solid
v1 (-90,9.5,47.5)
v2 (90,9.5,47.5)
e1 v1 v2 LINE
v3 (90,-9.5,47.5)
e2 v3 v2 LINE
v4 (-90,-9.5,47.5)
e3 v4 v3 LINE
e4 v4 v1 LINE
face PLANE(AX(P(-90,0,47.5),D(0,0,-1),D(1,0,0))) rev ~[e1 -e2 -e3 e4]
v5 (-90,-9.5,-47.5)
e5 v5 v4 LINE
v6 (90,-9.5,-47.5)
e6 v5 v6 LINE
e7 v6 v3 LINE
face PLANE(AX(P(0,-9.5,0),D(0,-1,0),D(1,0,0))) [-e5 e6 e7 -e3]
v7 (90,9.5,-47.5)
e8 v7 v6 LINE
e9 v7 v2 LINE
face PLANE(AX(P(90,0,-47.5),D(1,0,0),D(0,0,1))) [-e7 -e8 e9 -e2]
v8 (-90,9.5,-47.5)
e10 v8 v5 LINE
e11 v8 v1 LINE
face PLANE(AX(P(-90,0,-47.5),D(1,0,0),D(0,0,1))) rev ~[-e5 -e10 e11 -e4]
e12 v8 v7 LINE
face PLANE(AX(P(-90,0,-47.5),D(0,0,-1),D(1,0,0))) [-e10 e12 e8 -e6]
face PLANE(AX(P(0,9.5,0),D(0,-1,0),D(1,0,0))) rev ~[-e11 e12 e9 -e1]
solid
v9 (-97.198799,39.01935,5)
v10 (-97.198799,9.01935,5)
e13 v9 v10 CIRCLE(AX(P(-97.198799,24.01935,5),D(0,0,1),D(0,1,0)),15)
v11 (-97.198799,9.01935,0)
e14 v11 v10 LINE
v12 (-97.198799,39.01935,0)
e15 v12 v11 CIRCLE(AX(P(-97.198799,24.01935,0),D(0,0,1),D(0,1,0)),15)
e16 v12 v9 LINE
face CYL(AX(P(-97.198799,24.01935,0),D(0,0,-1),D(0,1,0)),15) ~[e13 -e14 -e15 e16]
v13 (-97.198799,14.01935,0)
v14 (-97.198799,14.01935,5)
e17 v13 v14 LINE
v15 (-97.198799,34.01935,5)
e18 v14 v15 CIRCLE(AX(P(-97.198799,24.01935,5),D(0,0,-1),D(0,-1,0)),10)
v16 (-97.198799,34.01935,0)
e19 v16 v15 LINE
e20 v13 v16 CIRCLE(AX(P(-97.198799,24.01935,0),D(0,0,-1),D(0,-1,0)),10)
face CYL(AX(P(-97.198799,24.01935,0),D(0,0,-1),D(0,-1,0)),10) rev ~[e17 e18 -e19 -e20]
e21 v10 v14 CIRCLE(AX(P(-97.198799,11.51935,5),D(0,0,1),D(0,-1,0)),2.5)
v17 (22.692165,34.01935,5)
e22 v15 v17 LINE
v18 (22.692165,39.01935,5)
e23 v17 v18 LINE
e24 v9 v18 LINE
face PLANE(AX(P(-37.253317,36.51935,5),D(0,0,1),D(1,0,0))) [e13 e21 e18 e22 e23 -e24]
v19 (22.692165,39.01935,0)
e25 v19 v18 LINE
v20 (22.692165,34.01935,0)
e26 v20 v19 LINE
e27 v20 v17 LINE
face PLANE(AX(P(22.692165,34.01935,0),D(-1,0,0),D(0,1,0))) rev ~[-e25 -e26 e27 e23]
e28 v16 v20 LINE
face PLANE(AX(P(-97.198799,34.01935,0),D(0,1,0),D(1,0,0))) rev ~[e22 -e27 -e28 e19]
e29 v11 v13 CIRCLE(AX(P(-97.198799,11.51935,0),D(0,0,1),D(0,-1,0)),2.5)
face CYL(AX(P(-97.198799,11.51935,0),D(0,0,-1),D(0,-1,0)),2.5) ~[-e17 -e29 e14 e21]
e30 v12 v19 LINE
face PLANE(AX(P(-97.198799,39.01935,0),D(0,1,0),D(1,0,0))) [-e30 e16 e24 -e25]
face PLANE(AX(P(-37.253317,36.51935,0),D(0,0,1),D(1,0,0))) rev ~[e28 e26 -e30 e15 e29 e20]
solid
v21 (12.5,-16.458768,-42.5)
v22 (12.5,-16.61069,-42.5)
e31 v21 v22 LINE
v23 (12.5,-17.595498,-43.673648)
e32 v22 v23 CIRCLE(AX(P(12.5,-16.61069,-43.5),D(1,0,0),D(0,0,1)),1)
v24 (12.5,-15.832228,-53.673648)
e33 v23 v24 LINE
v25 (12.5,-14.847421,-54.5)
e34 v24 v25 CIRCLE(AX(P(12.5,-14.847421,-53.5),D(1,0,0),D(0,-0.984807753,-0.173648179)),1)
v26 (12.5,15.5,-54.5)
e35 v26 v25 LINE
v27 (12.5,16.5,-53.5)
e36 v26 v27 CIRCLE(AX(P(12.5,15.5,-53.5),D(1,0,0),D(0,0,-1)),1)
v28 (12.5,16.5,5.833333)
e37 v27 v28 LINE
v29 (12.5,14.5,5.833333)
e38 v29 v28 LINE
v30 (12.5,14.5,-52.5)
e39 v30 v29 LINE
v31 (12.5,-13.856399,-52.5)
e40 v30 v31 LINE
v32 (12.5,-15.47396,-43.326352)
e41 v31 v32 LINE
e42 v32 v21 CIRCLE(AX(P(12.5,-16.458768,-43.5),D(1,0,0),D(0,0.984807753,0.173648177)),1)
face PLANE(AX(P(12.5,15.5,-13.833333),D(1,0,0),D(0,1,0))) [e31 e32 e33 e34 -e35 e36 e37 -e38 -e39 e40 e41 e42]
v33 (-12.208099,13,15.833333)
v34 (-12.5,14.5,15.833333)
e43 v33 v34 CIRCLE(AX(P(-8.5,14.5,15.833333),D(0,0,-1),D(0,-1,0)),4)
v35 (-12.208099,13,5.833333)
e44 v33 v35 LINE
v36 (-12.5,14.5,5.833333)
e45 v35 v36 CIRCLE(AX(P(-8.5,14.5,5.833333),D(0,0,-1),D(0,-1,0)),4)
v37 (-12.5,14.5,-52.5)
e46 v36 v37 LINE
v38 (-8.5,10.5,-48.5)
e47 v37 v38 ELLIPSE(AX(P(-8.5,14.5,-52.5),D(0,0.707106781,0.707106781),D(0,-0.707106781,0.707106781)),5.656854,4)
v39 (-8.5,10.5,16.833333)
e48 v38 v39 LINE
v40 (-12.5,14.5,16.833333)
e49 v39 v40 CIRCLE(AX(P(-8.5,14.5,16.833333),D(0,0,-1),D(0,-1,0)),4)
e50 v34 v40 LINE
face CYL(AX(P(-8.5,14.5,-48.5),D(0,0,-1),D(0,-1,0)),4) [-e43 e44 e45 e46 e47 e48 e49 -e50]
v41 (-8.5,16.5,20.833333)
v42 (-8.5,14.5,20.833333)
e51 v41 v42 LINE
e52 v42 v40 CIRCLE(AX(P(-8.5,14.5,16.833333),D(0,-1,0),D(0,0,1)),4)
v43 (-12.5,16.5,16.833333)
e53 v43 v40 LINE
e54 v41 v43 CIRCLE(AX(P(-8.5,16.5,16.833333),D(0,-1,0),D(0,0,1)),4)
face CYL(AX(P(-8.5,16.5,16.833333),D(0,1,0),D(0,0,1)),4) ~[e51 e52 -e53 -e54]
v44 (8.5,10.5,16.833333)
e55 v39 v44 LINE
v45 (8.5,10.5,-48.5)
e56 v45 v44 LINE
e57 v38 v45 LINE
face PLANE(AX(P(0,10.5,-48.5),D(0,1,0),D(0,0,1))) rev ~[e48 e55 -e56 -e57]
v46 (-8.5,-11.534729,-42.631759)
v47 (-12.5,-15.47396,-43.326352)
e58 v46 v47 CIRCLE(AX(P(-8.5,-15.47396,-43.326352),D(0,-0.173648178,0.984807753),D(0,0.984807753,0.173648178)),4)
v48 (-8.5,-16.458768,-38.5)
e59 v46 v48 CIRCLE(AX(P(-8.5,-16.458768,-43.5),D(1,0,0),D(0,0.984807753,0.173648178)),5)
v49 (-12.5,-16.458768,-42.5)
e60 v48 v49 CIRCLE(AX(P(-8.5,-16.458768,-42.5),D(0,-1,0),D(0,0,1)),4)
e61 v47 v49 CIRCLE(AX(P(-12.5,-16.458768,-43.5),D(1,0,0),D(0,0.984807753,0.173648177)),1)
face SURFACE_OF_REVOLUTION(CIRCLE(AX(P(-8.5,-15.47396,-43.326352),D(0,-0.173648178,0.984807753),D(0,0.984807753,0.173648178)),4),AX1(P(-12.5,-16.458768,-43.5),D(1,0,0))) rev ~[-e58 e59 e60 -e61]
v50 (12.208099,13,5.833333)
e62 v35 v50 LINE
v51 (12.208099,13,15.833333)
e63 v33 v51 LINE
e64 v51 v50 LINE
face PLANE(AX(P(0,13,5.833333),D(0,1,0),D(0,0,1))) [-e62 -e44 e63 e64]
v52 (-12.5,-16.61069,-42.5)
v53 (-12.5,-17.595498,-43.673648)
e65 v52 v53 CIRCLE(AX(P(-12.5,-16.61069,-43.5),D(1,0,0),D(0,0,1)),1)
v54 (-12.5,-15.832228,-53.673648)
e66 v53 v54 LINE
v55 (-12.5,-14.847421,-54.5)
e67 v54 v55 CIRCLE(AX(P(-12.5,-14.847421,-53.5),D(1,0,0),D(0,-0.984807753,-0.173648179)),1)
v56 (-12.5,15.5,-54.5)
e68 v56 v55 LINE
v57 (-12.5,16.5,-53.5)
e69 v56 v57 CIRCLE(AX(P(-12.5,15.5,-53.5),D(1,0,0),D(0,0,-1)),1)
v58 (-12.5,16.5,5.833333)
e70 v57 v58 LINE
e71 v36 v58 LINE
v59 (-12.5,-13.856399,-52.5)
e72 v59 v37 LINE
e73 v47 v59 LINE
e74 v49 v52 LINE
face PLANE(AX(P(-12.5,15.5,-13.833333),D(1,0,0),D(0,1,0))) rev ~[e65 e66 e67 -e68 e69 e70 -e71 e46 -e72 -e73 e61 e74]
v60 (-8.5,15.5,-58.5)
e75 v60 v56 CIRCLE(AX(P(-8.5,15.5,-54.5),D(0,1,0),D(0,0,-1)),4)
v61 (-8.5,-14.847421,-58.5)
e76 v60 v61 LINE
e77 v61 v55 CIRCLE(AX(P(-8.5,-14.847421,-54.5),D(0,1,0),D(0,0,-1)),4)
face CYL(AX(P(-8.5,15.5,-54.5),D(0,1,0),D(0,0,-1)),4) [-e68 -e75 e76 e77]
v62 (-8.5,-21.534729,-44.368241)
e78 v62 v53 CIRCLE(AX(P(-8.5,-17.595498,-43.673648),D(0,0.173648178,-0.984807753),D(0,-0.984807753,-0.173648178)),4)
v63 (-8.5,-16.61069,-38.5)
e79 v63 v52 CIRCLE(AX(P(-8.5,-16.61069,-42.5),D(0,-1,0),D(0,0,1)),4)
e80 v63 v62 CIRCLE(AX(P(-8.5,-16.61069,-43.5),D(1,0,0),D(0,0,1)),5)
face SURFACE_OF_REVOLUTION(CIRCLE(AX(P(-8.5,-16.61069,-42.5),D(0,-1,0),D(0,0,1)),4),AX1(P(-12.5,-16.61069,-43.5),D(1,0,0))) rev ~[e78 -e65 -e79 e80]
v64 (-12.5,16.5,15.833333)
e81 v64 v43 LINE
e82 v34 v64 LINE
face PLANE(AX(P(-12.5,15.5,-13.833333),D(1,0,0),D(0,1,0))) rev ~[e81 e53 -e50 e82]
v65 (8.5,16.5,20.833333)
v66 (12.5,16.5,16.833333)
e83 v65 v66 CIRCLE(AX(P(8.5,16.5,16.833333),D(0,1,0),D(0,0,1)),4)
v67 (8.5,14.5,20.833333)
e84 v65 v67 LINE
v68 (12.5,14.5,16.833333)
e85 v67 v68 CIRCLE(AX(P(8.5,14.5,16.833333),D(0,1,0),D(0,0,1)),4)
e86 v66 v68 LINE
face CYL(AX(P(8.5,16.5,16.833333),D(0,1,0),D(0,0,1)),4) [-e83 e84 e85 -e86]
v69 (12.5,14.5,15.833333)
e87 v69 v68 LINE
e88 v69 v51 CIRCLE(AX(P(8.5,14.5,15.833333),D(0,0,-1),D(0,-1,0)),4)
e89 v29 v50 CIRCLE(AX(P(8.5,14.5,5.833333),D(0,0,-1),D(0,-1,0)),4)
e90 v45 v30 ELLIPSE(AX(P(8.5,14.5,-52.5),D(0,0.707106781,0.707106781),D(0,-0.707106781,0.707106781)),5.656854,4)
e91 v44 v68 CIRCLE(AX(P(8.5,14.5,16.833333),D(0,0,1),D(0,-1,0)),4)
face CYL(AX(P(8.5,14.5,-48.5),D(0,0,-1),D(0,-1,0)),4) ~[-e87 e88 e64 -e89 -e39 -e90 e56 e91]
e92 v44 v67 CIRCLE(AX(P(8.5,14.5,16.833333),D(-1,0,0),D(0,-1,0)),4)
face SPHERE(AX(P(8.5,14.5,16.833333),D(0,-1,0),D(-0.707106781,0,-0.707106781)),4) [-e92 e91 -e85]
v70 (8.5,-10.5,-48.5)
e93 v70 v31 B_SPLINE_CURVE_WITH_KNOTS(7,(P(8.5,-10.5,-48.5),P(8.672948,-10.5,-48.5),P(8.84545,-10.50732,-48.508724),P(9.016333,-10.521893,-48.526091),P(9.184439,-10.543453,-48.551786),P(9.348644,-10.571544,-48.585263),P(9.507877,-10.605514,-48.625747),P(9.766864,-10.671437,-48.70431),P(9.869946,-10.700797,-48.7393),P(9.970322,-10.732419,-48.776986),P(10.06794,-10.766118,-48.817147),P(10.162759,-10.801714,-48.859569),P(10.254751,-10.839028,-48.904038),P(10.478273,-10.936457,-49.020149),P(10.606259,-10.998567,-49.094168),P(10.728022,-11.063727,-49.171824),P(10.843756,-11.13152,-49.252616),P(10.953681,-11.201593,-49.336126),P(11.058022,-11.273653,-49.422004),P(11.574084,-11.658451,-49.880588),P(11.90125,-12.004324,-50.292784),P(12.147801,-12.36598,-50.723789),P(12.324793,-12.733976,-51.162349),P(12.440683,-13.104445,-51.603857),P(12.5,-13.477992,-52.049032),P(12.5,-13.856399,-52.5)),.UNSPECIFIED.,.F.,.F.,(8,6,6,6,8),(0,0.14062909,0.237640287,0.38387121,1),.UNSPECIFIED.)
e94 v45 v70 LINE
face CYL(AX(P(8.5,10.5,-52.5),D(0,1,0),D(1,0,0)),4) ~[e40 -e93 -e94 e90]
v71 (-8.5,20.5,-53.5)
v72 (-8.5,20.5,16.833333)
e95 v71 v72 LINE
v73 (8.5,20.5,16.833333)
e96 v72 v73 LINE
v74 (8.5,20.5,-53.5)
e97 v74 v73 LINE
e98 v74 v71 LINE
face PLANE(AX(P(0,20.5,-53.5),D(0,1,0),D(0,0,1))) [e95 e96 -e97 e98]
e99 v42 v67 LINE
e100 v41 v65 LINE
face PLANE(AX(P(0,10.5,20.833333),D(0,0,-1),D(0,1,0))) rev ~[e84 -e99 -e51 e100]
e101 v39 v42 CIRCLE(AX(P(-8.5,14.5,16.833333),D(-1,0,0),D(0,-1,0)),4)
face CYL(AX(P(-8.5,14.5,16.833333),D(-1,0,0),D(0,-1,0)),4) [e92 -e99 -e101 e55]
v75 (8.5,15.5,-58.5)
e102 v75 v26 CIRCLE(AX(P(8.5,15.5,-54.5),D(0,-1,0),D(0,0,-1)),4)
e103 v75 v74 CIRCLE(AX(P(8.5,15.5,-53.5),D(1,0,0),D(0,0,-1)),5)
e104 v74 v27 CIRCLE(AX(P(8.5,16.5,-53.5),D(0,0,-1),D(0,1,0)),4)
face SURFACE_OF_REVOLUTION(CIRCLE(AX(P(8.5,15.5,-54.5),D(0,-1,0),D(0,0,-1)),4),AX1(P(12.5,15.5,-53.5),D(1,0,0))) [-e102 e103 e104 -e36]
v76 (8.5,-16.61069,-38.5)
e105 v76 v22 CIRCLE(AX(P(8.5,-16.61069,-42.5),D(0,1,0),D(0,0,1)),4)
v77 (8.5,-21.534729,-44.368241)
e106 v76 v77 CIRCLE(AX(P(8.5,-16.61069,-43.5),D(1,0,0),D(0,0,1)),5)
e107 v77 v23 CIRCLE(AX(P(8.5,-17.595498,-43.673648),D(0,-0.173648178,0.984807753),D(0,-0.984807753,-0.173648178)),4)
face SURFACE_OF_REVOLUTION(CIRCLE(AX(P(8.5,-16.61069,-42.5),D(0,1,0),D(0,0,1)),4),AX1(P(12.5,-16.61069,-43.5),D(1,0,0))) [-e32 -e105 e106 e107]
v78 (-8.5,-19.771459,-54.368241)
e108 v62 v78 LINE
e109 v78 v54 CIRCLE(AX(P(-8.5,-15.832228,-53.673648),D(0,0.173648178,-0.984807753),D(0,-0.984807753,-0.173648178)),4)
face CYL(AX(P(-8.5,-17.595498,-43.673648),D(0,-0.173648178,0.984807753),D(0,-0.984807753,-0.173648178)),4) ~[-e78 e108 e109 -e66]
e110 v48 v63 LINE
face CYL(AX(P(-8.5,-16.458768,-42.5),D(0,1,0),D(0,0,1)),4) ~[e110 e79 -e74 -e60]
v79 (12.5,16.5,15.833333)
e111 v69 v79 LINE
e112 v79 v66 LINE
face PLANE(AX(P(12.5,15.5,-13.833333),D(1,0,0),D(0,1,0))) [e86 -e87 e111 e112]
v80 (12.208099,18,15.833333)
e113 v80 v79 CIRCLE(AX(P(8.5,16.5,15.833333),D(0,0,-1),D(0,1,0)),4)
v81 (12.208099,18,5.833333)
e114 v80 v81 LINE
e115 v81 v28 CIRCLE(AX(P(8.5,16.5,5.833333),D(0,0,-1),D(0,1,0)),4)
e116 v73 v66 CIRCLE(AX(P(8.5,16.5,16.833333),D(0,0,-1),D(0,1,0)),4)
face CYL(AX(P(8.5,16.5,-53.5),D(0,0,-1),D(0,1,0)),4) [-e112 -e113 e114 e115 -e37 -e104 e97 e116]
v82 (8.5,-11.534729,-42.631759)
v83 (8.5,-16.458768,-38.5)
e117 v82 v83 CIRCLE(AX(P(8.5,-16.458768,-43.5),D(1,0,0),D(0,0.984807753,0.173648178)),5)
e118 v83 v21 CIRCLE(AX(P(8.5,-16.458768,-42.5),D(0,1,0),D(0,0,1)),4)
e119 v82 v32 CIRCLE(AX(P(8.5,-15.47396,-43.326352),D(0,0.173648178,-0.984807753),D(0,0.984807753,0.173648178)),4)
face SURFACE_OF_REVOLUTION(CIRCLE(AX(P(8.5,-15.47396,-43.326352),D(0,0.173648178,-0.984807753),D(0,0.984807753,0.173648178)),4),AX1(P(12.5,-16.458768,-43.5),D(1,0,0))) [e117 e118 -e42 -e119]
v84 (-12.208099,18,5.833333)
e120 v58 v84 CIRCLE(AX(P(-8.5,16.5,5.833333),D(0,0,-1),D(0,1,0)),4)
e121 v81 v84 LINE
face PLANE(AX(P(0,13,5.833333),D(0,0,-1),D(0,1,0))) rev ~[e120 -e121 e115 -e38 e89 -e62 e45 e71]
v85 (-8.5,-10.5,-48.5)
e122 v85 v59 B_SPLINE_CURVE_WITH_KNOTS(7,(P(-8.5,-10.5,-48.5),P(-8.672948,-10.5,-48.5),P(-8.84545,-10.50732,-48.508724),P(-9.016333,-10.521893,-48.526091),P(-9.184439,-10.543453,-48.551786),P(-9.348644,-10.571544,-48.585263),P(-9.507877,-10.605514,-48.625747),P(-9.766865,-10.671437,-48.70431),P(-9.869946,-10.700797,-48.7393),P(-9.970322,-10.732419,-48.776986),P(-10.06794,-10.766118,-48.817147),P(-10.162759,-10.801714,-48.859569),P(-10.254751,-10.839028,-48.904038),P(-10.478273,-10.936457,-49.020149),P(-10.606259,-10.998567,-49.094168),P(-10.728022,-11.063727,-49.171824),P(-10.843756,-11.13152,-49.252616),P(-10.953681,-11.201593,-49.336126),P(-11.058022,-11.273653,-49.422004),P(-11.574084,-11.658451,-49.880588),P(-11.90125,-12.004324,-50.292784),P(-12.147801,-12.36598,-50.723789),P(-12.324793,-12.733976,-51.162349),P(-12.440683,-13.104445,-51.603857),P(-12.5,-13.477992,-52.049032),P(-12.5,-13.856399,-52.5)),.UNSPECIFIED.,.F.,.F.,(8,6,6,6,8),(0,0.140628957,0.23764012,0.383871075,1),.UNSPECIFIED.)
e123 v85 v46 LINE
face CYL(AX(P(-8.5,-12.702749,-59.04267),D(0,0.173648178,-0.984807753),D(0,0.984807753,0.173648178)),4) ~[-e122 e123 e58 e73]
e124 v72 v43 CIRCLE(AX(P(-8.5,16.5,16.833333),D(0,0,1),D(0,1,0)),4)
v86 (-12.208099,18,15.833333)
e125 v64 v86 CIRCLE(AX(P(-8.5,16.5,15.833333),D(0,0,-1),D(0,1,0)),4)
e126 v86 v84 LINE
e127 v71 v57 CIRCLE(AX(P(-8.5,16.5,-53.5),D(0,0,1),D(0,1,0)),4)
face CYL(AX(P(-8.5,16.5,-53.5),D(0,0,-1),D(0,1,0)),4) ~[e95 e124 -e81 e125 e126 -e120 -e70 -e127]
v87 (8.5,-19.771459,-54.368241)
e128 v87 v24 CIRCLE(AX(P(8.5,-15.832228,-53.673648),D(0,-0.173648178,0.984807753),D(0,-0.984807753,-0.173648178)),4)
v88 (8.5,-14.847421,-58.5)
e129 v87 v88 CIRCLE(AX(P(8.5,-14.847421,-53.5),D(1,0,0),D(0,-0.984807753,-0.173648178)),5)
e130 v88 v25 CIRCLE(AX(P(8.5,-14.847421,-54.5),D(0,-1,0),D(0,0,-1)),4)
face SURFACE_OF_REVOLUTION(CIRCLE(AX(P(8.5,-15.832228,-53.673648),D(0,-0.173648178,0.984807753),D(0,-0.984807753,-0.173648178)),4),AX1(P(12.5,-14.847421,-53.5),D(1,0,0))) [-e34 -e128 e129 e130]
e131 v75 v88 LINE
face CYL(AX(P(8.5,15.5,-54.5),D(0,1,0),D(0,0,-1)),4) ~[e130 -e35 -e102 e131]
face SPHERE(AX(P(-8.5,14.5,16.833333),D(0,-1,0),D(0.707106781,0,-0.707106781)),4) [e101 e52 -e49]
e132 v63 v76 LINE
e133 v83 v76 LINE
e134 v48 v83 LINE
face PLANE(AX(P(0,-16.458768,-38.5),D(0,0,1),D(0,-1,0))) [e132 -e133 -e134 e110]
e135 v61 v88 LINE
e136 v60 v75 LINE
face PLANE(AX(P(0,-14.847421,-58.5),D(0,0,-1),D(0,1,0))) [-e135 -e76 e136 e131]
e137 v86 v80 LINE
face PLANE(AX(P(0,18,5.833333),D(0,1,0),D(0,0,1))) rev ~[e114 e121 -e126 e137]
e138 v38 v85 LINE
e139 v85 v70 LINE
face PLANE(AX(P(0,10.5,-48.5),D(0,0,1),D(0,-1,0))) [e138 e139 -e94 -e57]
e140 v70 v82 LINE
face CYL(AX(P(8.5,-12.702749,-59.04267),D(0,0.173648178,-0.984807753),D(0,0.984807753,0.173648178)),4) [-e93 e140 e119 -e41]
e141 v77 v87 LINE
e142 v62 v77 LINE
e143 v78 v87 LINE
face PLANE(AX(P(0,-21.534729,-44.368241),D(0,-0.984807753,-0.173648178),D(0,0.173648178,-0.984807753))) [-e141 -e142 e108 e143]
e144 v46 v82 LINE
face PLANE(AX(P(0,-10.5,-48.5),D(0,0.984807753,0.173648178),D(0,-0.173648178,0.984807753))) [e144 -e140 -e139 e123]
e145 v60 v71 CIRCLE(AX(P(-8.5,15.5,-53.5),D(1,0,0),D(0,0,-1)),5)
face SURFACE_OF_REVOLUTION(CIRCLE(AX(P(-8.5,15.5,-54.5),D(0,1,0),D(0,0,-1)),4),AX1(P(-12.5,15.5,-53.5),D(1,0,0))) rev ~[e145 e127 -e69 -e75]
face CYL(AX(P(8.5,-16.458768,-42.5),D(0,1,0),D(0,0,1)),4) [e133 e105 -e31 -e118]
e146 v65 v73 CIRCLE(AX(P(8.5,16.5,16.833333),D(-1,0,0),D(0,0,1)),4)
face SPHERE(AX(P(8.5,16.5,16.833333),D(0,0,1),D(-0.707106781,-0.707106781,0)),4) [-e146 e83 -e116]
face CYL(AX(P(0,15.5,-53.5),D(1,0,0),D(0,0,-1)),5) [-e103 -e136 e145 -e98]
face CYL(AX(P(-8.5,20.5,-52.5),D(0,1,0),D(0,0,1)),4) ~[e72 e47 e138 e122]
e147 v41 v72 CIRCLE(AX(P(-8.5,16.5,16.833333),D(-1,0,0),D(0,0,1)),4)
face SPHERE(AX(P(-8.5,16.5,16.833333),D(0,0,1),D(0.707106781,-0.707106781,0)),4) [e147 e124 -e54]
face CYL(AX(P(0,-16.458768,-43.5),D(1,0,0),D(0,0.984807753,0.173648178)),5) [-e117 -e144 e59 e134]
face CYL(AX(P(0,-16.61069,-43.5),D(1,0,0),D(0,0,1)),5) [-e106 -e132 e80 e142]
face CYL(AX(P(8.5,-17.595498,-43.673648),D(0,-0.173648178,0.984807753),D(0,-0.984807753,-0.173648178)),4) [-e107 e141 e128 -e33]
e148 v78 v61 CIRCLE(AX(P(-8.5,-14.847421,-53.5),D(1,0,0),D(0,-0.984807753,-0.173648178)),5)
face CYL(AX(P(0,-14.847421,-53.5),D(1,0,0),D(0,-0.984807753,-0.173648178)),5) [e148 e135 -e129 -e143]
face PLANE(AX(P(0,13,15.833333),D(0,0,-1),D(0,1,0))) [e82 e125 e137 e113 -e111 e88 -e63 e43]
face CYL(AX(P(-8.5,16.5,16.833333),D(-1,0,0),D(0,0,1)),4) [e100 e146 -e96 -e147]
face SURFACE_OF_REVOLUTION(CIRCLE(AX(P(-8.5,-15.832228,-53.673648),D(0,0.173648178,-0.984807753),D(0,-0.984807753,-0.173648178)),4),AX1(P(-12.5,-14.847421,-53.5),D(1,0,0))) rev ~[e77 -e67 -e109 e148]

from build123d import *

# Parameters (mm, degrees)
F0_W          = 180
F0_H          = 95
F1_DEPTH      = 9.5
F3_W          = 10
F3_H          = 69.3333333333
F3_W_2        = 5
F3_H_2        = 10
F4_DEPTH      = 12.5
F5_T1_DEPTH   = 10.1542661189
F5_T3_DEPTH   = 65.3333333333
F5_T5_DEPTH   = 2
F5_T7_DEPTH   = 17
F5_T9_DEPTH   = 30.3474206258
F5_T11_DEPTH  = 70.3333333333
F5_T13_DEPTH  = 0.1519224699
F5_S17_W      = 4
F5_S17_H      = 4
F5_T18_DEPTH  = 4
F5_S23_W      = 4
F5_S23_H      = 4
F5_T24_DEPTH  = 4
F5_S29_W      = 4
F5_S29_H      = 4
F5_T30_DEPTH  = 4
F5_S35_W      = 4
F5_S35_H      = 4
F5_T36_DEPTH  = 4
F5_T42_DEPTH  = 31
F5_T47_DEPTH  = 31
F5_T50_ANGLE  = 100
F5_T52_ANGLE  = 80
F5_T54_ANGLE  = 90
F5_T56_ANGLE  = 80
F5_T60_DEPTH  = 15.958767963
F5_T63_ANGLE  = 100
F5_T65_ANGLE  = 80
F5_T67_ANGLE  = 90
F5_T69_ANGLE  = 80
F5_T73_DEPTH  = 15.958767963
F5_T79_DEPTH  = 75.3333333333
F5_T83_DEPTH  = 41
F5_T90_DEPTH  = 15.958767963
F5_T94_DEPTH  = 31
F5_T101_DEPTH = 75.3333333333
F5_T105_DEPTH = 41
F5_T112_DEPTH = 15.958767963
F5_T116_DEPTH = 31
F6_W          = 119.8909639199
F6_H          = 5
F7_DEPTH      = 5


# Not quite as in the source:
# - a fillet or chamfer that OpenCascade refuses, or shapes differently, is made with other operations: its cross-section is extruded or revolved along the edge and cut away or added


with BuildPart() as f1:
    # F0 (on Front) → F1 (new body, symmetric)
    with BuildSketch(Plane.XZ):
        Rectangle(F0_W, F0_H)
    extrude(amount=F1_DEPTH, both=True)


with BuildPart() as f4:
    # F3 (on Right) → F4 (new body, symmetric)
    with BuildSketch(Plane.YZ):
        with Locations((15.5, -13.8333333333)):
            Rectangle(F3_W, F3_H)
        with Locations((15.5, 10.8333333333)):
            Rectangle(F3_W_2, F3_H_2, mode=Mode.SUBTRACT)
        with BuildLine():
            Line((20.5, -53.5), (20.5, -48.5))
            Line((20.5, -48.5), (10.5, -48.5))
            Line((10.5, -48.5), (-10.5, -48.5))
            Line((-10.5, -48.5), (-8.7367301929, -58.5))
            Line((-8.7367301929, -58.5), (15.5, -58.5))
            ThreePointArc((15.5, -58.5), (19.0355339059, -57.0355339059), (20.5, -53.5))
        make_face()
        Polygon((-8.7367301929, -58.5), (-10.5, -48.5), (-10.5, -58.5), align=None)
        with BuildLine():
            Line((-10.5, -58.5), (-10.5, -48.5))
            Line((-10.5, -48.5), (-11.5347291979, -42.6317591117))
            ThreePointArc((-11.5347291979, -42.6317591117), (-13.2448299145, -39.6697777844), (-16.458767963, -38.5))
            Line((-16.458767963, -38.5), (-16.6106904328, -38.5))
            ThreePointArc((-16.6106904328, -38.5), (-20.4409126484, -40.2860619516), (-21.5347291979, -44.3682408883))
            Line((-21.5347291979, -44.3682408883), (-19.7714593908, -54.3682408883))
            ThreePointArc((-19.7714593908, -54.3682408883), (-18.0613586742, -57.3302222156), (-14.8474206258, -58.5))
            Line((-14.8474206258, -58.5), (-10.5, -58.5))
        make_face()
    extrude(amount=F4_DEPTH, both=True)

    # F5: fillet of radius 4 on 10 edges, made by hand

    # F5_s2 → F5_t1 (cut)
    with BuildSketch(Plane(origin=(0, 6.9380645139, -39.3477191408), x_dir=(1, 0, 0), z_dir=(0, 0.1736481777, -0.984807753))):
        with BuildLine():
            ThreePointArc((-8.5, 28.9120324497), (-11.3284271247, 27.7404595744), (-12.5, 24.9120324497))
            Line((-12.5, 24.9120324497), (-12.5, 28.9120324497))
            Line((-12.5, 28.9120324497), (-8.5, 28.9120324497))
        make_face()
        with BuildLine():
            ThreePointArc((8.5, 28.9120324497), (11.3284271247, 27.7404595744), (12.5, 24.9120324497))
            Line((12.5, 24.9120324497), (12.5, 28.9120324497))
            Line((12.5, 28.9120324497), (8.5, 28.9120324497))
        make_face()
    extrude(amount=F5_T1_DEPTH, mode=Mode.SUBTRACT)

    # F5_s4 → F5_t3 (cut)
    with BuildSketch(Plane.XY.offset(-48.5)):
        with BuildLine():
            ThreePointArc((8.5, 10.5), (11.3284271247, 11.6715728753), (12.5, 14.5))
            Line((12.5, 14.5), (12.5, 10.5))
            Line((12.5, 10.5), (8.5, 10.5))
        make_face()
        with BuildLine():
            ThreePointArc((-8.5, 10.5), (-11.3284271247, 11.6715728753), (-12.5, 14.5))
            Line((-12.5, 14.5), (-12.5, 10.5))
            Line((-12.5, 10.5), (-8.5, 10.5))
        make_face()
    extrude(amount=F5_T3_DEPTH, mode=Mode.SUBTRACT)

    # F5_s6 → F5_t5 (cut)
    with BuildSketch(Plane.XZ.offset(-16.5)):
        with BuildLine():
            ThreePointArc((-8.5, 20.8333333333), (-11.3284271247, 19.6617604581), (-12.5, 16.8333333333))
            Line((-12.5, 16.8333333333), (-12.5, 20.8333333333))
            Line((-12.5, 20.8333333333), (-8.5, 20.8333333333))
        make_face()
        with BuildLine():
            ThreePointArc((8.5, 20.8333333333), (11.3284271247, 19.6617604581), (12.5, 16.8333333333))
            Line((12.5, 16.8333333333), (12.5, 20.8333333333))
            Line((12.5, 20.8333333333), (8.5, 20.8333333333))
        make_face()
    extrude(amount=F5_T5_DEPTH, mode=Mode.SUBTRACT)

    # F5_s8 → F5_t7 (cut)
    with BuildSketch(Plane.YZ.offset(-8.5)):
        with BuildLine():
            ThreePointArc((10.5, 16.8333333333), (11.6715728753, 19.6617604581), (14.5, 20.8333333333))
            Line((14.5, 20.8333333333), (10.5, 20.8333333333))
            Line((10.5, 20.8333333333), (10.5, 16.8333333333))
        make_face()
        with BuildLine():
            ThreePointArc((16.5, 20.8333333333), (19.3284271247, 19.6617604581), (20.5, 16.8333333333))
            Line((20.5, 16.8333333333), (20.5, 20.8333333333))
            Line((20.5, 20.8333333333), (16.5, 20.8333333333))
        make_face()
    extrude(amount=F5_T7_DEPTH, mode=Mode.SUBTRACT)

    # F5_s10 → F5_t9 (cut)
    with BuildSketch(Plane.XZ.offset(-15.5)):
        with BuildLine():
            ThreePointArc((8.5, -58.5), (11.3284271247, -57.3284271247), (12.5, -54.5))
            Line((12.5, -54.5), (12.5, -58.5))
            Line((12.5, -58.5), (8.5, -58.5))
        make_face()
        with BuildLine():
            ThreePointArc((-8.5, -58.5), (-11.3284271247, -57.3284271247), (-12.5, -54.5))
            Line((-12.5, -54.5), (-12.5, -58.5))
            Line((-12.5, -58.5), (-8.5, -58.5))
        make_face()
    extrude(amount=F5_T9_DEPTH, mode=Mode.SUBTRACT)

    # F5_s12 → F5_t11 (cut)
    with BuildSketch(Plane.XY.offset(-53.5)):
        with BuildLine():
            ThreePointArc((8.5, 20.5), (11.3284271247, 19.3284271247), (12.5, 16.5))
            Line((12.5, 16.5), (12.5, 20.5))
            Line((12.5, 20.5), (8.5, 20.5))
        make_face()
        with BuildLine():
            ThreePointArc((-8.5, 20.5), (-11.3284271247, 19.3284271247), (-12.5, 16.5))
            Line((-12.5, 16.5), (-12.5, 20.5))
            Line((-12.5, 20.5), (-8.5, 20.5))
        make_face()
    extrude(amount=F5_T11_DEPTH, mode=Mode.SUBTRACT)

    # F5_s14 → F5_t13 (cut)
    with BuildSketch(Plane.XZ.offset(16.458767963)):
        with BuildLine():
            ThreePointArc((8.5, -38.5), (11.3284271247, -39.6715728753), (12.5, -42.5))
            Line((12.5, -42.5), (12.5, -38.5))
            Line((12.5, -38.5), (8.5, -38.5))
        make_face()
        with BuildLine():
            ThreePointArc((-8.5, -38.5), (-11.3284271247, -39.6715728753), (-12.5, -42.5))
            Line((-12.5, -42.5), (-12.5, -38.5))
            Line((-12.5, -38.5), (-8.5, -38.5))
        make_face()
    extrude(amount=F5_T13_DEPTH, mode=Mode.SUBTRACT)


with BuildPart() as f5_tool16:
    # F5_s17 → F5_t18 (new body)
    with BuildSketch(Plane.XZ.offset(-14.5)):
        with Locations((10.5, 18.8333333333)):
            Rectangle(F5_S17_W, F5_S17_H)
    extrude(amount=F5_T18_DEPTH)

    # F5_s19 → F5_t20 (revolve, cut)
    with BuildSketch(Plane(origin=(8.5, 14.5, 16.8333333333), x_dir=(-0.7071067812, 0, -0.7071067812), z_dir=(-0.7071067812, 0, 0.7071067812))):
        with BuildLine():
            ThreePointArc((0, -4), (4, 0), (0, 4))
            Line((0, 4), (0, -4))
        make_face()
    revolve(axis=Axis((8.5, 14.5, 16.8333333333), (0, -1, 0)), mode=Mode.SUBTRACT)


with BuildPart() as f4_1:
    add(f4.part)

    # F5_t15: cut F5_tool16
    add(f5_tool16.part, mode=Mode.SUBTRACT)


with BuildPart() as f5_tool22:
    # F5_s23 → F5_t24 (new body)
    with BuildSketch(Plane.XZ.offset(-14.5)):
        with Locations((-10.5, 18.8333333333)):
            Rectangle(F5_S23_W, F5_S23_H)
    extrude(amount=F5_T24_DEPTH)

    # F5_s25 → F5_t26 (revolve, cut)
    with BuildSketch(Plane(origin=(-8.5, 14.5, 16.8333333333), x_dir=(0.7071067812, 0, -0.7071067812), z_dir=(-0.7071067812, 0, -0.7071067812))):
        with BuildLine():
            ThreePointArc((0, -4), (4, 0), (0, 4))
            Line((0, 4), (0, -4))
        make_face()
    revolve(axis=Axis((-8.5, 14.5, 16.8333333333), (0, -1, 0)), mode=Mode.SUBTRACT)


with BuildPart() as f4_2:
    add(f4_1.part)

    # F5_t21: cut F5_tool22
    add(f5_tool22.part, mode=Mode.SUBTRACT)


with BuildPart() as f5_tool28:
    # F5_s29 → F5_t30 (new body)
    with BuildSketch(Plane.XY.offset(16.8333333333)):
        with Locations((-10.5, 18.5)):
            Rectangle(F5_S29_W, F5_S29_H)
    extrude(amount=F5_T30_DEPTH)

    # F5_s31 → F5_t32 (revolve, cut)
    with BuildSketch(Plane(origin=(-8.5, 16.5, 16.8333333333), x_dir=(0.7071067812, -0.7071067812, 0), z_dir=(-0.7071067812, -0.7071067812, 0))):
        with BuildLine():
            ThreePointArc((0, -4), (4, 0), (0, 4))
            Line((0, 4), (0, -4))
        make_face()
    revolve(axis=Axis((-8.5, 16.5, 16.8333333333), (0, 0, 1)), mode=Mode.SUBTRACT)


with BuildPart() as f4_3:
    add(f4_2.part)

    # F5_t27: cut F5_tool28
    add(f5_tool28.part, mode=Mode.SUBTRACT)


with BuildPart() as f5_tool34:
    # F5_s35 → F5_t36 (new body)
    with BuildSketch(Plane.XY.offset(16.8333333333)):
        with Locations((10.5, 18.5)):
            Rectangle(F5_S35_W, F5_S35_H)
    extrude(amount=F5_T36_DEPTH)

    # F5_s37 → F5_t38 (revolve, cut)
    with BuildSketch(Plane(origin=(8.5, 16.5, 16.8333333333), x_dir=(-0.7071067812, -0.7071067812, 0), z_dir=(-0.7071067812, 0.7071067812, 0))):
        with BuildLine():
            ThreePointArc((0, -4), (4, 0), (0, 4))
            Line((0, 4), (0, -4))
        make_face()
    revolve(axis=Axis((8.5, 16.5, 16.8333333333), (0, 0, 1)), mode=Mode.SUBTRACT)


with BuildPart() as f4_4:
    add(f4_3.part)

    # F5_t33: cut F5_tool34
    add(f5_tool34.part, mode=Mode.SUBTRACT)


with BuildPart() as f5_tool40:
    # F5_s41 → F5_t42 (new body)
    with BuildSketch(Plane.XZ.offset(-10.5)):
        with BuildLine():
            ThreePointArc((12.5, -52.5), (11.3284271247, -49.6715728753), (8.5, -48.5))
            Line((8.5, -48.5), (12.5, -48.5))
            Line((12.5, -48.5), (12.5, -52.5))
        make_face()
    extrude(amount=F5_T42_DEPTH)

    split(bisect_by=Plane(origin=(0, -18.4773747348, -3.2580596984), x_dir=(1, 0, 0), z_dir=(0, 0.984807753, 0.1736481777)), keep=Keep.TOP)


with BuildPart() as f4_5:
    add(f4_4.part)

    # F5_t39: cut F5_tool40
    add(f5_tool40.part, mode=Mode.SUBTRACT)


with BuildPart() as f5_tool45:
    # F5_s46 → F5_t47 (new body)
    with BuildSketch(Plane.XZ.offset(-10.5)):
        with BuildLine():
            ThreePointArc((-8.5, -48.5), (-11.3284271247, -49.6715728753), (-12.5, -52.5))
            Line((-12.5, -52.5), (-12.5, -48.5))
            Line((-12.5, -48.5), (-8.5, -48.5))
        make_face()
    extrude(amount=F5_T47_DEPTH)

    split(bisect_by=Plane(origin=(0, -18.4773747348, -3.2580596984), x_dir=(1, 0, 0), z_dir=(0, 0.984807753, 0.1736481777)), keep=Keep.TOP)


with BuildPart() as f4_6:
    add(f4_5.part)

    # F5_t44: cut F5_tool45
    add(f5_tool45.part, mode=Mode.SUBTRACT)

    # F5_s49 → F5_t50 (revolve, cut)
    with BuildSketch(Plane.XZ.offset(16.6106904328)):
        with BuildLine():
            ThreePointArc((8.5, -38.5), (11.3284271247, -39.6715728753), (12.5, -42.5))
            Line((12.5, -42.5), (12.5, -38.5))
            Line((12.5, -38.5), (8.5, -38.5))
        make_face()
    revolve(axis=Axis((12.5, -16.6106904328, -43.5), (1, 0, 0)), revolution_arc=F5_T50_ANGLE, mode=Mode.SUBTRACT)

    # F5_s51 → F5_t52 (revolve, cut)
    with BuildSketch(Plane(origin=(0, 8.7013343209, -49.3477191408), x_dir=(1, 0, 0), z_dir=(0, -0.1736481777, 0.984807753))):
        with BuildLine():
            ThreePointArc((8.5, -28.9120324497), (11.3284271247, -27.7404595744), (12.5, -24.9120324497))
            Line((12.5, -24.9120324497), (12.5, -28.9120324497))
            Line((12.5, -28.9120324497), (8.5, -28.9120324497))
        make_face()
    revolve(axis=Axis((12.5, -14.8474206258, -53.5), (1, 0, 0)), revolution_arc=F5_T52_ANGLE, mode=Mode.SUBTRACT)

    # F5_s53 → F5_t54 (revolve, cut)
    with BuildSketch(Plane.XZ.offset(-15.5)):
        with BuildLine():
            ThreePointArc((8.5, -58.5), (11.3284271247, -57.3284271247), (12.5, -54.5))
            Line((12.5, -54.5), (12.5, -58.5))
            Line((12.5, -58.5), (8.5, -58.5))
        make_face()
    revolve(axis=Axis((12.5, 15.5, -53.5), (1, 0, 0)), revolution_arc=F5_T54_ANGLE, mode=Mode.SUBTRACT)

    # F5_s55 → F5_t56 (revolve, cut)
    with BuildSketch(Plane(origin=(0, 6.9426455369, -39.3736994133), x_dir=(1, 0, 0), z_dir=(0, 0.1736481777, -0.984807753))):
        with BuildLine():
            ThreePointArc((8.5, 18.7624180235), (11.3284271247, 19.9339908987), (12.5, 22.7624180235))
            Line((12.5, 22.7624180235), (12.5, 18.7624180235))
            Line((12.5, 18.7624180235), (8.5, 18.7624180235))
        make_face()
    revolve(axis=Axis((12.5, -16.458767963, -43.5), (1, 0, 0)), revolution_arc=F5_T56_ANGLE, mode=Mode.SUBTRACT)


with BuildPart() as f5_tool58:
    # F5_s59 → F5_t60 (new body)
    with BuildSketch(Plane(origin=(0, 9.7138565114, -55.0900178317), x_dir=(1, 0, 0), z_dir=(0, -0.1736481777, 0.984807753))):
        with BuildLine():
            ThreePointArc((8.5, -18.7624180235), (11.3284271247, -19.9339908987), (12.5, -22.7624180235))
            Line((12.5, -22.7624180235), (12.5, -18.7624180235))
            Line((12.5, -18.7624180235), (8.5, -18.7624180235))
        make_face()
    extrude(amount=F5_T60_DEPTH)

    split(bisect_by=Plane.XY.offset(-48.5), keep=Keep.TOP)


with BuildPart() as f4_7:
    add(f4_6.part)

    # F5_t57: cut F5_tool58
    add(f5_tool58.part, mode=Mode.SUBTRACT)

    # F5_s62 → F5_t63 (revolve, cut)
    with BuildSketch(Plane.XZ.offset(16.6106904328)):
        with BuildLine():
            ThreePointArc((-8.5, -38.5), (-11.3284271247, -39.6715728753), (-12.5, -42.5))
            Line((-12.5, -42.5), (-12.5, -38.5))
            Line((-12.5, -38.5), (-8.5, -38.5))
        make_face()
    revolve(axis=Axis((-12.5, -16.6106904328, -43.5), (1, 0, 0)), revolution_arc=F5_T63_ANGLE, mode=Mode.SUBTRACT)

    # F5_s64 → F5_t65 (revolve, cut)
    with BuildSketch(Plane(origin=(0, 8.7013343209, -49.3477191408), x_dir=(1, 0, 0), z_dir=(0, -0.1736481777, 0.984807753))):
        with BuildLine():
            ThreePointArc((-8.5, -28.9120324497), (-11.3284271247, -27.7404595744), (-12.5, -24.9120324497))
            Line((-12.5, -24.9120324497), (-12.5, -28.9120324497))
            Line((-12.5, -28.9120324497), (-8.5, -28.9120324497))
        make_face()
    revolve(axis=Axis((-12.5, -14.8474206258, -53.5), (1, 0, 0)), revolution_arc=F5_T65_ANGLE, mode=Mode.SUBTRACT)

    # F5_s66 → F5_t67 (revolve, cut)
    with BuildSketch(Plane.XZ.offset(-15.5)):
        with BuildLine():
            ThreePointArc((-8.5, -58.5), (-11.3284271247, -57.3284271247), (-12.5, -54.5))
            Line((-12.5, -54.5), (-12.5, -58.5))
            Line((-12.5, -58.5), (-8.5, -58.5))
        make_face()
    revolve(axis=Axis((-12.5, 15.5, -53.5), (1, 0, 0)), revolution_arc=F5_T67_ANGLE, mode=Mode.SUBTRACT)

    # F5_s68 → F5_t69 (revolve, cut)
    with BuildSketch(Plane(origin=(0, 6.9426455369, -39.3736994133), x_dir=(1, 0, 0), z_dir=(0, 0.1736481777, -0.984807753))):
        with BuildLine():
            ThreePointArc((-8.5, 18.7624180235), (-11.3284271247, 19.9339908987), (-12.5, 22.7624180235))
            Line((-12.5, 22.7624180235), (-12.5, 18.7624180235))
            Line((-12.5, 18.7624180235), (-8.5, 18.7624180235))
        make_face()
    revolve(axis=Axis((-12.5, -16.458767963, -43.5), (1, 0, 0)), revolution_arc=F5_T69_ANGLE, mode=Mode.SUBTRACT)


with BuildPart() as f5_tool71:
    # F5_s72 → F5_t73 (new body)
    with BuildSketch(Plane(origin=(0, 9.7138565114, -55.0900178317), x_dir=(1, 0, 0), z_dir=(0, -0.1736481777, 0.984807753))):
        with BuildLine():
            ThreePointArc((-8.5, -18.7624180235), (-11.3284271247, -19.9339908987), (-12.5, -22.7624180235))
            Line((-12.5, -22.7624180235), (-12.5, -18.7624180235))
            Line((-12.5, -18.7624180235), (-8.5, -18.7624180235))
        make_face()
    extrude(amount=F5_T73_DEPTH)

    split(bisect_by=Plane.XY.offset(-48.5), keep=Keep.TOP)


with BuildPart() as f4_8:
    add(f4_7.part)

    # F5_t70: cut F5_tool71
    add(f5_tool71.part, mode=Mode.SUBTRACT)


with BuildPart() as f5_tool77:
    # F5_s78 → F5_t79 (new body)
    with BuildSketch(Plane.XY.offset(16.8333333333)):
        with BuildLine():
            ThreePointArc((8.5, 10.5), (11.3284271247, 11.6715728753), (12.5, 14.5))
            Line((12.5, 14.5), (12.5, 10.5))
            Line((12.5, 10.5), (8.5, 10.5))
        make_face()
    extrude(amount=-F5_T79_DEPTH)

    split(bisect_by=Plane.XY.offset(-48.5), keep=Keep.BOTTOM)


with BuildPart() as f5_tool81:
    # F5_s82 → F5_t83 (new body)
    with BuildSketch(Plane.XZ.offset(-20.5)):
        with BuildLine():
            ThreePointArc((12.5, -52.5), (11.3284271247, -49.6715728753), (8.5, -48.5))
            Line((8.5, -48.5), (12.5, -48.5))
            Line((12.5, -48.5), (12.5, -52.5))
        make_face()
    extrude(amount=F5_T83_DEPTH)

    split(bisect_by=Plane.XZ.offset(-10.5), keep=Keep.BOTTOM)


with BuildPart() as f5_tool77_1:
    add(f5_tool77.part)

    # F5_t85: intersect F5_tool81
    add(f5_tool81.part, mode=Mode.INTERSECT)


with BuildPart() as f4_9:
    add(f4_8.part)

    # F5_t75: cut F5_tool77
    add(f5_tool77_1.part, mode=Mode.SUBTRACT)


with BuildPart() as f5_tool88:
    # F5_s89 → F5_t90 (new body)
    with BuildSketch(Plane(origin=(0, 9.7138565114, -55.0900178317), x_dir=(1, 0, 0), z_dir=(0, -0.1736481777, 0.984807753))):
        with BuildLine():
            ThreePointArc((8.5, -18.7624180235), (11.3284271247, -19.9339908987), (12.5, -22.7624180235))
            Line((12.5, -22.7624180235), (12.5, -18.7624180235))
            Line((12.5, -18.7624180235), (8.5, -18.7624180235))
        make_face()
    extrude(amount=F5_T90_DEPTH)

    split(bisect_by=Plane.XY.offset(-48.5), keep=Keep.BOTTOM)


with BuildPart() as f5_tool92:
    # F5_s93 → F5_t94 (new body)
    with BuildSketch(Plane.XZ.offset(-10.5)):
        with BuildLine():
            ThreePointArc((12.5, -52.5), (11.3284271247, -49.6715728753), (8.5, -48.5))
            Line((8.5, -48.5), (12.5, -48.5))
            Line((12.5, -48.5), (12.5, -52.5))
        make_face()
    extrude(amount=F5_T94_DEPTH)

    split(bisect_by=Plane(origin=(0, -18.4773747348, -3.2580596984), x_dir=(1, 0, 0), z_dir=(0, -0.984807753, -0.1736481777)), keep=Keep.TOP)


with BuildPart() as f5_tool88_1:
    add(f5_tool88.part)

    # F5_t96: intersect F5_tool92
    add(f5_tool92.part, mode=Mode.INTERSECT)


with BuildPart() as f4_10:
    add(f4_9.part)

    # F5_t86: cut F5_tool88
    add(f5_tool88_1.part, mode=Mode.SUBTRACT)


with BuildPart() as f5_tool99:
    # F5_s100 → F5_t101 (new body)
    with BuildSketch(Plane.XY.offset(16.8333333333)):
        with BuildLine():
            ThreePointArc((-8.5, 10.5), (-11.3284271247, 11.6715728753), (-12.5, 14.5))
            Line((-12.5, 14.5), (-12.5, 10.5))
            Line((-12.5, 10.5), (-8.5, 10.5))
        make_face()
    extrude(amount=-F5_T101_DEPTH)

    split(bisect_by=Plane.XY.offset(-48.5), keep=Keep.BOTTOM)


with BuildPart() as f5_tool103:
    # F5_s104 → F5_t105 (new body)
    with BuildSketch(Plane.XZ.offset(-20.5)):
        with BuildLine():
            ThreePointArc((-8.5, -48.5), (-11.3284271247, -49.6715728753), (-12.5, -52.5))
            Line((-12.5, -52.5), (-12.5, -48.5))
            Line((-12.5, -48.5), (-8.5, -48.5))
        make_face()
    extrude(amount=F5_T105_DEPTH)

    split(bisect_by=Plane.XZ.offset(-10.5), keep=Keep.BOTTOM)


with BuildPart() as f5_tool99_1:
    add(f5_tool99.part)

    # F5_t107: intersect F5_tool103
    add(f5_tool103.part, mode=Mode.INTERSECT)


with BuildPart() as f4_11:
    add(f4_10.part)

    # F5_t97: cut F5_tool99
    add(f5_tool99_1.part, mode=Mode.SUBTRACT)


with BuildPart() as f5_tool110:
    # F5_s111 → F5_t112 (new body)
    with BuildSketch(Plane(origin=(0, 9.7138565114, -55.0900178317), x_dir=(1, 0, 0), z_dir=(0, -0.1736481777, 0.984807753))):
        with BuildLine():
            ThreePointArc((-8.5, -18.7624180235), (-11.3284271247, -19.9339908987), (-12.5, -22.7624180235))
            Line((-12.5, -22.7624180235), (-12.5, -18.7624180235))
            Line((-12.5, -18.7624180235), (-8.5, -18.7624180235))
        make_face()
    extrude(amount=F5_T112_DEPTH)

    split(bisect_by=Plane.XY.offset(-48.5), keep=Keep.BOTTOM)


with BuildPart() as f5_tool114:
    # F5_s115 → F5_t116 (new body)
    with BuildSketch(Plane.XZ.offset(-10.5)):
        with BuildLine():
            ThreePointArc((-8.5, -48.5), (-11.3284271247, -49.6715728753), (-12.5, -52.5))
            Line((-12.5, -52.5), (-12.5, -48.5))
            Line((-12.5, -48.5), (-8.5, -48.5))
        make_face()
    extrude(amount=F5_T116_DEPTH)

    split(bisect_by=Plane(origin=(0, -18.4773747348, -3.2580596984), x_dir=(1, 0, 0), z_dir=(0, -0.984807753, -0.1736481777)), keep=Keep.TOP)


with BuildPart() as f5_tool110_1:
    add(f5_tool110.part)

    # F5_t118: intersect F5_tool114
    add(f5_tool114.part, mode=Mode.INTERSECT)


with BuildPart() as f4_12:
    add(f4_11.part)

    # F5_t108: cut F5_tool110
    add(f5_tool110_1.part, mode=Mode.SUBTRACT)


with BuildPart() as f7:
    # F6 (on Top) → F7 (new body)
    with BuildSketch(Plane.XY):
        with Locations((-37.2533172926, 36.5193495899)):
            Rectangle(F6_W, F6_H)
        with BuildLine():
            Line((-97.1987992525, 34.0193495899), (-97.1987992525, 39.0193495899))
            ThreePointArc((-97.1987992525, 39.0193495899), (-112.1987992525, 24.0193495899), (-97.1987992525, 9.0193495899))
            ThreePointArc((-97.1987992525, 9.0193495899), (-94.6987992525, 11.5193495899), (-97.1987992525, 14.0193495899))
            ThreePointArc((-97.1987992525, 14.0193495899), (-107.1987992525, 24.0193495899), (-97.1987992525, 34.0193495899))
        make_face()
    extrude(amount=F7_DEPTH)


solid = Compound([f1.part, f4_12.part, f7.part])
